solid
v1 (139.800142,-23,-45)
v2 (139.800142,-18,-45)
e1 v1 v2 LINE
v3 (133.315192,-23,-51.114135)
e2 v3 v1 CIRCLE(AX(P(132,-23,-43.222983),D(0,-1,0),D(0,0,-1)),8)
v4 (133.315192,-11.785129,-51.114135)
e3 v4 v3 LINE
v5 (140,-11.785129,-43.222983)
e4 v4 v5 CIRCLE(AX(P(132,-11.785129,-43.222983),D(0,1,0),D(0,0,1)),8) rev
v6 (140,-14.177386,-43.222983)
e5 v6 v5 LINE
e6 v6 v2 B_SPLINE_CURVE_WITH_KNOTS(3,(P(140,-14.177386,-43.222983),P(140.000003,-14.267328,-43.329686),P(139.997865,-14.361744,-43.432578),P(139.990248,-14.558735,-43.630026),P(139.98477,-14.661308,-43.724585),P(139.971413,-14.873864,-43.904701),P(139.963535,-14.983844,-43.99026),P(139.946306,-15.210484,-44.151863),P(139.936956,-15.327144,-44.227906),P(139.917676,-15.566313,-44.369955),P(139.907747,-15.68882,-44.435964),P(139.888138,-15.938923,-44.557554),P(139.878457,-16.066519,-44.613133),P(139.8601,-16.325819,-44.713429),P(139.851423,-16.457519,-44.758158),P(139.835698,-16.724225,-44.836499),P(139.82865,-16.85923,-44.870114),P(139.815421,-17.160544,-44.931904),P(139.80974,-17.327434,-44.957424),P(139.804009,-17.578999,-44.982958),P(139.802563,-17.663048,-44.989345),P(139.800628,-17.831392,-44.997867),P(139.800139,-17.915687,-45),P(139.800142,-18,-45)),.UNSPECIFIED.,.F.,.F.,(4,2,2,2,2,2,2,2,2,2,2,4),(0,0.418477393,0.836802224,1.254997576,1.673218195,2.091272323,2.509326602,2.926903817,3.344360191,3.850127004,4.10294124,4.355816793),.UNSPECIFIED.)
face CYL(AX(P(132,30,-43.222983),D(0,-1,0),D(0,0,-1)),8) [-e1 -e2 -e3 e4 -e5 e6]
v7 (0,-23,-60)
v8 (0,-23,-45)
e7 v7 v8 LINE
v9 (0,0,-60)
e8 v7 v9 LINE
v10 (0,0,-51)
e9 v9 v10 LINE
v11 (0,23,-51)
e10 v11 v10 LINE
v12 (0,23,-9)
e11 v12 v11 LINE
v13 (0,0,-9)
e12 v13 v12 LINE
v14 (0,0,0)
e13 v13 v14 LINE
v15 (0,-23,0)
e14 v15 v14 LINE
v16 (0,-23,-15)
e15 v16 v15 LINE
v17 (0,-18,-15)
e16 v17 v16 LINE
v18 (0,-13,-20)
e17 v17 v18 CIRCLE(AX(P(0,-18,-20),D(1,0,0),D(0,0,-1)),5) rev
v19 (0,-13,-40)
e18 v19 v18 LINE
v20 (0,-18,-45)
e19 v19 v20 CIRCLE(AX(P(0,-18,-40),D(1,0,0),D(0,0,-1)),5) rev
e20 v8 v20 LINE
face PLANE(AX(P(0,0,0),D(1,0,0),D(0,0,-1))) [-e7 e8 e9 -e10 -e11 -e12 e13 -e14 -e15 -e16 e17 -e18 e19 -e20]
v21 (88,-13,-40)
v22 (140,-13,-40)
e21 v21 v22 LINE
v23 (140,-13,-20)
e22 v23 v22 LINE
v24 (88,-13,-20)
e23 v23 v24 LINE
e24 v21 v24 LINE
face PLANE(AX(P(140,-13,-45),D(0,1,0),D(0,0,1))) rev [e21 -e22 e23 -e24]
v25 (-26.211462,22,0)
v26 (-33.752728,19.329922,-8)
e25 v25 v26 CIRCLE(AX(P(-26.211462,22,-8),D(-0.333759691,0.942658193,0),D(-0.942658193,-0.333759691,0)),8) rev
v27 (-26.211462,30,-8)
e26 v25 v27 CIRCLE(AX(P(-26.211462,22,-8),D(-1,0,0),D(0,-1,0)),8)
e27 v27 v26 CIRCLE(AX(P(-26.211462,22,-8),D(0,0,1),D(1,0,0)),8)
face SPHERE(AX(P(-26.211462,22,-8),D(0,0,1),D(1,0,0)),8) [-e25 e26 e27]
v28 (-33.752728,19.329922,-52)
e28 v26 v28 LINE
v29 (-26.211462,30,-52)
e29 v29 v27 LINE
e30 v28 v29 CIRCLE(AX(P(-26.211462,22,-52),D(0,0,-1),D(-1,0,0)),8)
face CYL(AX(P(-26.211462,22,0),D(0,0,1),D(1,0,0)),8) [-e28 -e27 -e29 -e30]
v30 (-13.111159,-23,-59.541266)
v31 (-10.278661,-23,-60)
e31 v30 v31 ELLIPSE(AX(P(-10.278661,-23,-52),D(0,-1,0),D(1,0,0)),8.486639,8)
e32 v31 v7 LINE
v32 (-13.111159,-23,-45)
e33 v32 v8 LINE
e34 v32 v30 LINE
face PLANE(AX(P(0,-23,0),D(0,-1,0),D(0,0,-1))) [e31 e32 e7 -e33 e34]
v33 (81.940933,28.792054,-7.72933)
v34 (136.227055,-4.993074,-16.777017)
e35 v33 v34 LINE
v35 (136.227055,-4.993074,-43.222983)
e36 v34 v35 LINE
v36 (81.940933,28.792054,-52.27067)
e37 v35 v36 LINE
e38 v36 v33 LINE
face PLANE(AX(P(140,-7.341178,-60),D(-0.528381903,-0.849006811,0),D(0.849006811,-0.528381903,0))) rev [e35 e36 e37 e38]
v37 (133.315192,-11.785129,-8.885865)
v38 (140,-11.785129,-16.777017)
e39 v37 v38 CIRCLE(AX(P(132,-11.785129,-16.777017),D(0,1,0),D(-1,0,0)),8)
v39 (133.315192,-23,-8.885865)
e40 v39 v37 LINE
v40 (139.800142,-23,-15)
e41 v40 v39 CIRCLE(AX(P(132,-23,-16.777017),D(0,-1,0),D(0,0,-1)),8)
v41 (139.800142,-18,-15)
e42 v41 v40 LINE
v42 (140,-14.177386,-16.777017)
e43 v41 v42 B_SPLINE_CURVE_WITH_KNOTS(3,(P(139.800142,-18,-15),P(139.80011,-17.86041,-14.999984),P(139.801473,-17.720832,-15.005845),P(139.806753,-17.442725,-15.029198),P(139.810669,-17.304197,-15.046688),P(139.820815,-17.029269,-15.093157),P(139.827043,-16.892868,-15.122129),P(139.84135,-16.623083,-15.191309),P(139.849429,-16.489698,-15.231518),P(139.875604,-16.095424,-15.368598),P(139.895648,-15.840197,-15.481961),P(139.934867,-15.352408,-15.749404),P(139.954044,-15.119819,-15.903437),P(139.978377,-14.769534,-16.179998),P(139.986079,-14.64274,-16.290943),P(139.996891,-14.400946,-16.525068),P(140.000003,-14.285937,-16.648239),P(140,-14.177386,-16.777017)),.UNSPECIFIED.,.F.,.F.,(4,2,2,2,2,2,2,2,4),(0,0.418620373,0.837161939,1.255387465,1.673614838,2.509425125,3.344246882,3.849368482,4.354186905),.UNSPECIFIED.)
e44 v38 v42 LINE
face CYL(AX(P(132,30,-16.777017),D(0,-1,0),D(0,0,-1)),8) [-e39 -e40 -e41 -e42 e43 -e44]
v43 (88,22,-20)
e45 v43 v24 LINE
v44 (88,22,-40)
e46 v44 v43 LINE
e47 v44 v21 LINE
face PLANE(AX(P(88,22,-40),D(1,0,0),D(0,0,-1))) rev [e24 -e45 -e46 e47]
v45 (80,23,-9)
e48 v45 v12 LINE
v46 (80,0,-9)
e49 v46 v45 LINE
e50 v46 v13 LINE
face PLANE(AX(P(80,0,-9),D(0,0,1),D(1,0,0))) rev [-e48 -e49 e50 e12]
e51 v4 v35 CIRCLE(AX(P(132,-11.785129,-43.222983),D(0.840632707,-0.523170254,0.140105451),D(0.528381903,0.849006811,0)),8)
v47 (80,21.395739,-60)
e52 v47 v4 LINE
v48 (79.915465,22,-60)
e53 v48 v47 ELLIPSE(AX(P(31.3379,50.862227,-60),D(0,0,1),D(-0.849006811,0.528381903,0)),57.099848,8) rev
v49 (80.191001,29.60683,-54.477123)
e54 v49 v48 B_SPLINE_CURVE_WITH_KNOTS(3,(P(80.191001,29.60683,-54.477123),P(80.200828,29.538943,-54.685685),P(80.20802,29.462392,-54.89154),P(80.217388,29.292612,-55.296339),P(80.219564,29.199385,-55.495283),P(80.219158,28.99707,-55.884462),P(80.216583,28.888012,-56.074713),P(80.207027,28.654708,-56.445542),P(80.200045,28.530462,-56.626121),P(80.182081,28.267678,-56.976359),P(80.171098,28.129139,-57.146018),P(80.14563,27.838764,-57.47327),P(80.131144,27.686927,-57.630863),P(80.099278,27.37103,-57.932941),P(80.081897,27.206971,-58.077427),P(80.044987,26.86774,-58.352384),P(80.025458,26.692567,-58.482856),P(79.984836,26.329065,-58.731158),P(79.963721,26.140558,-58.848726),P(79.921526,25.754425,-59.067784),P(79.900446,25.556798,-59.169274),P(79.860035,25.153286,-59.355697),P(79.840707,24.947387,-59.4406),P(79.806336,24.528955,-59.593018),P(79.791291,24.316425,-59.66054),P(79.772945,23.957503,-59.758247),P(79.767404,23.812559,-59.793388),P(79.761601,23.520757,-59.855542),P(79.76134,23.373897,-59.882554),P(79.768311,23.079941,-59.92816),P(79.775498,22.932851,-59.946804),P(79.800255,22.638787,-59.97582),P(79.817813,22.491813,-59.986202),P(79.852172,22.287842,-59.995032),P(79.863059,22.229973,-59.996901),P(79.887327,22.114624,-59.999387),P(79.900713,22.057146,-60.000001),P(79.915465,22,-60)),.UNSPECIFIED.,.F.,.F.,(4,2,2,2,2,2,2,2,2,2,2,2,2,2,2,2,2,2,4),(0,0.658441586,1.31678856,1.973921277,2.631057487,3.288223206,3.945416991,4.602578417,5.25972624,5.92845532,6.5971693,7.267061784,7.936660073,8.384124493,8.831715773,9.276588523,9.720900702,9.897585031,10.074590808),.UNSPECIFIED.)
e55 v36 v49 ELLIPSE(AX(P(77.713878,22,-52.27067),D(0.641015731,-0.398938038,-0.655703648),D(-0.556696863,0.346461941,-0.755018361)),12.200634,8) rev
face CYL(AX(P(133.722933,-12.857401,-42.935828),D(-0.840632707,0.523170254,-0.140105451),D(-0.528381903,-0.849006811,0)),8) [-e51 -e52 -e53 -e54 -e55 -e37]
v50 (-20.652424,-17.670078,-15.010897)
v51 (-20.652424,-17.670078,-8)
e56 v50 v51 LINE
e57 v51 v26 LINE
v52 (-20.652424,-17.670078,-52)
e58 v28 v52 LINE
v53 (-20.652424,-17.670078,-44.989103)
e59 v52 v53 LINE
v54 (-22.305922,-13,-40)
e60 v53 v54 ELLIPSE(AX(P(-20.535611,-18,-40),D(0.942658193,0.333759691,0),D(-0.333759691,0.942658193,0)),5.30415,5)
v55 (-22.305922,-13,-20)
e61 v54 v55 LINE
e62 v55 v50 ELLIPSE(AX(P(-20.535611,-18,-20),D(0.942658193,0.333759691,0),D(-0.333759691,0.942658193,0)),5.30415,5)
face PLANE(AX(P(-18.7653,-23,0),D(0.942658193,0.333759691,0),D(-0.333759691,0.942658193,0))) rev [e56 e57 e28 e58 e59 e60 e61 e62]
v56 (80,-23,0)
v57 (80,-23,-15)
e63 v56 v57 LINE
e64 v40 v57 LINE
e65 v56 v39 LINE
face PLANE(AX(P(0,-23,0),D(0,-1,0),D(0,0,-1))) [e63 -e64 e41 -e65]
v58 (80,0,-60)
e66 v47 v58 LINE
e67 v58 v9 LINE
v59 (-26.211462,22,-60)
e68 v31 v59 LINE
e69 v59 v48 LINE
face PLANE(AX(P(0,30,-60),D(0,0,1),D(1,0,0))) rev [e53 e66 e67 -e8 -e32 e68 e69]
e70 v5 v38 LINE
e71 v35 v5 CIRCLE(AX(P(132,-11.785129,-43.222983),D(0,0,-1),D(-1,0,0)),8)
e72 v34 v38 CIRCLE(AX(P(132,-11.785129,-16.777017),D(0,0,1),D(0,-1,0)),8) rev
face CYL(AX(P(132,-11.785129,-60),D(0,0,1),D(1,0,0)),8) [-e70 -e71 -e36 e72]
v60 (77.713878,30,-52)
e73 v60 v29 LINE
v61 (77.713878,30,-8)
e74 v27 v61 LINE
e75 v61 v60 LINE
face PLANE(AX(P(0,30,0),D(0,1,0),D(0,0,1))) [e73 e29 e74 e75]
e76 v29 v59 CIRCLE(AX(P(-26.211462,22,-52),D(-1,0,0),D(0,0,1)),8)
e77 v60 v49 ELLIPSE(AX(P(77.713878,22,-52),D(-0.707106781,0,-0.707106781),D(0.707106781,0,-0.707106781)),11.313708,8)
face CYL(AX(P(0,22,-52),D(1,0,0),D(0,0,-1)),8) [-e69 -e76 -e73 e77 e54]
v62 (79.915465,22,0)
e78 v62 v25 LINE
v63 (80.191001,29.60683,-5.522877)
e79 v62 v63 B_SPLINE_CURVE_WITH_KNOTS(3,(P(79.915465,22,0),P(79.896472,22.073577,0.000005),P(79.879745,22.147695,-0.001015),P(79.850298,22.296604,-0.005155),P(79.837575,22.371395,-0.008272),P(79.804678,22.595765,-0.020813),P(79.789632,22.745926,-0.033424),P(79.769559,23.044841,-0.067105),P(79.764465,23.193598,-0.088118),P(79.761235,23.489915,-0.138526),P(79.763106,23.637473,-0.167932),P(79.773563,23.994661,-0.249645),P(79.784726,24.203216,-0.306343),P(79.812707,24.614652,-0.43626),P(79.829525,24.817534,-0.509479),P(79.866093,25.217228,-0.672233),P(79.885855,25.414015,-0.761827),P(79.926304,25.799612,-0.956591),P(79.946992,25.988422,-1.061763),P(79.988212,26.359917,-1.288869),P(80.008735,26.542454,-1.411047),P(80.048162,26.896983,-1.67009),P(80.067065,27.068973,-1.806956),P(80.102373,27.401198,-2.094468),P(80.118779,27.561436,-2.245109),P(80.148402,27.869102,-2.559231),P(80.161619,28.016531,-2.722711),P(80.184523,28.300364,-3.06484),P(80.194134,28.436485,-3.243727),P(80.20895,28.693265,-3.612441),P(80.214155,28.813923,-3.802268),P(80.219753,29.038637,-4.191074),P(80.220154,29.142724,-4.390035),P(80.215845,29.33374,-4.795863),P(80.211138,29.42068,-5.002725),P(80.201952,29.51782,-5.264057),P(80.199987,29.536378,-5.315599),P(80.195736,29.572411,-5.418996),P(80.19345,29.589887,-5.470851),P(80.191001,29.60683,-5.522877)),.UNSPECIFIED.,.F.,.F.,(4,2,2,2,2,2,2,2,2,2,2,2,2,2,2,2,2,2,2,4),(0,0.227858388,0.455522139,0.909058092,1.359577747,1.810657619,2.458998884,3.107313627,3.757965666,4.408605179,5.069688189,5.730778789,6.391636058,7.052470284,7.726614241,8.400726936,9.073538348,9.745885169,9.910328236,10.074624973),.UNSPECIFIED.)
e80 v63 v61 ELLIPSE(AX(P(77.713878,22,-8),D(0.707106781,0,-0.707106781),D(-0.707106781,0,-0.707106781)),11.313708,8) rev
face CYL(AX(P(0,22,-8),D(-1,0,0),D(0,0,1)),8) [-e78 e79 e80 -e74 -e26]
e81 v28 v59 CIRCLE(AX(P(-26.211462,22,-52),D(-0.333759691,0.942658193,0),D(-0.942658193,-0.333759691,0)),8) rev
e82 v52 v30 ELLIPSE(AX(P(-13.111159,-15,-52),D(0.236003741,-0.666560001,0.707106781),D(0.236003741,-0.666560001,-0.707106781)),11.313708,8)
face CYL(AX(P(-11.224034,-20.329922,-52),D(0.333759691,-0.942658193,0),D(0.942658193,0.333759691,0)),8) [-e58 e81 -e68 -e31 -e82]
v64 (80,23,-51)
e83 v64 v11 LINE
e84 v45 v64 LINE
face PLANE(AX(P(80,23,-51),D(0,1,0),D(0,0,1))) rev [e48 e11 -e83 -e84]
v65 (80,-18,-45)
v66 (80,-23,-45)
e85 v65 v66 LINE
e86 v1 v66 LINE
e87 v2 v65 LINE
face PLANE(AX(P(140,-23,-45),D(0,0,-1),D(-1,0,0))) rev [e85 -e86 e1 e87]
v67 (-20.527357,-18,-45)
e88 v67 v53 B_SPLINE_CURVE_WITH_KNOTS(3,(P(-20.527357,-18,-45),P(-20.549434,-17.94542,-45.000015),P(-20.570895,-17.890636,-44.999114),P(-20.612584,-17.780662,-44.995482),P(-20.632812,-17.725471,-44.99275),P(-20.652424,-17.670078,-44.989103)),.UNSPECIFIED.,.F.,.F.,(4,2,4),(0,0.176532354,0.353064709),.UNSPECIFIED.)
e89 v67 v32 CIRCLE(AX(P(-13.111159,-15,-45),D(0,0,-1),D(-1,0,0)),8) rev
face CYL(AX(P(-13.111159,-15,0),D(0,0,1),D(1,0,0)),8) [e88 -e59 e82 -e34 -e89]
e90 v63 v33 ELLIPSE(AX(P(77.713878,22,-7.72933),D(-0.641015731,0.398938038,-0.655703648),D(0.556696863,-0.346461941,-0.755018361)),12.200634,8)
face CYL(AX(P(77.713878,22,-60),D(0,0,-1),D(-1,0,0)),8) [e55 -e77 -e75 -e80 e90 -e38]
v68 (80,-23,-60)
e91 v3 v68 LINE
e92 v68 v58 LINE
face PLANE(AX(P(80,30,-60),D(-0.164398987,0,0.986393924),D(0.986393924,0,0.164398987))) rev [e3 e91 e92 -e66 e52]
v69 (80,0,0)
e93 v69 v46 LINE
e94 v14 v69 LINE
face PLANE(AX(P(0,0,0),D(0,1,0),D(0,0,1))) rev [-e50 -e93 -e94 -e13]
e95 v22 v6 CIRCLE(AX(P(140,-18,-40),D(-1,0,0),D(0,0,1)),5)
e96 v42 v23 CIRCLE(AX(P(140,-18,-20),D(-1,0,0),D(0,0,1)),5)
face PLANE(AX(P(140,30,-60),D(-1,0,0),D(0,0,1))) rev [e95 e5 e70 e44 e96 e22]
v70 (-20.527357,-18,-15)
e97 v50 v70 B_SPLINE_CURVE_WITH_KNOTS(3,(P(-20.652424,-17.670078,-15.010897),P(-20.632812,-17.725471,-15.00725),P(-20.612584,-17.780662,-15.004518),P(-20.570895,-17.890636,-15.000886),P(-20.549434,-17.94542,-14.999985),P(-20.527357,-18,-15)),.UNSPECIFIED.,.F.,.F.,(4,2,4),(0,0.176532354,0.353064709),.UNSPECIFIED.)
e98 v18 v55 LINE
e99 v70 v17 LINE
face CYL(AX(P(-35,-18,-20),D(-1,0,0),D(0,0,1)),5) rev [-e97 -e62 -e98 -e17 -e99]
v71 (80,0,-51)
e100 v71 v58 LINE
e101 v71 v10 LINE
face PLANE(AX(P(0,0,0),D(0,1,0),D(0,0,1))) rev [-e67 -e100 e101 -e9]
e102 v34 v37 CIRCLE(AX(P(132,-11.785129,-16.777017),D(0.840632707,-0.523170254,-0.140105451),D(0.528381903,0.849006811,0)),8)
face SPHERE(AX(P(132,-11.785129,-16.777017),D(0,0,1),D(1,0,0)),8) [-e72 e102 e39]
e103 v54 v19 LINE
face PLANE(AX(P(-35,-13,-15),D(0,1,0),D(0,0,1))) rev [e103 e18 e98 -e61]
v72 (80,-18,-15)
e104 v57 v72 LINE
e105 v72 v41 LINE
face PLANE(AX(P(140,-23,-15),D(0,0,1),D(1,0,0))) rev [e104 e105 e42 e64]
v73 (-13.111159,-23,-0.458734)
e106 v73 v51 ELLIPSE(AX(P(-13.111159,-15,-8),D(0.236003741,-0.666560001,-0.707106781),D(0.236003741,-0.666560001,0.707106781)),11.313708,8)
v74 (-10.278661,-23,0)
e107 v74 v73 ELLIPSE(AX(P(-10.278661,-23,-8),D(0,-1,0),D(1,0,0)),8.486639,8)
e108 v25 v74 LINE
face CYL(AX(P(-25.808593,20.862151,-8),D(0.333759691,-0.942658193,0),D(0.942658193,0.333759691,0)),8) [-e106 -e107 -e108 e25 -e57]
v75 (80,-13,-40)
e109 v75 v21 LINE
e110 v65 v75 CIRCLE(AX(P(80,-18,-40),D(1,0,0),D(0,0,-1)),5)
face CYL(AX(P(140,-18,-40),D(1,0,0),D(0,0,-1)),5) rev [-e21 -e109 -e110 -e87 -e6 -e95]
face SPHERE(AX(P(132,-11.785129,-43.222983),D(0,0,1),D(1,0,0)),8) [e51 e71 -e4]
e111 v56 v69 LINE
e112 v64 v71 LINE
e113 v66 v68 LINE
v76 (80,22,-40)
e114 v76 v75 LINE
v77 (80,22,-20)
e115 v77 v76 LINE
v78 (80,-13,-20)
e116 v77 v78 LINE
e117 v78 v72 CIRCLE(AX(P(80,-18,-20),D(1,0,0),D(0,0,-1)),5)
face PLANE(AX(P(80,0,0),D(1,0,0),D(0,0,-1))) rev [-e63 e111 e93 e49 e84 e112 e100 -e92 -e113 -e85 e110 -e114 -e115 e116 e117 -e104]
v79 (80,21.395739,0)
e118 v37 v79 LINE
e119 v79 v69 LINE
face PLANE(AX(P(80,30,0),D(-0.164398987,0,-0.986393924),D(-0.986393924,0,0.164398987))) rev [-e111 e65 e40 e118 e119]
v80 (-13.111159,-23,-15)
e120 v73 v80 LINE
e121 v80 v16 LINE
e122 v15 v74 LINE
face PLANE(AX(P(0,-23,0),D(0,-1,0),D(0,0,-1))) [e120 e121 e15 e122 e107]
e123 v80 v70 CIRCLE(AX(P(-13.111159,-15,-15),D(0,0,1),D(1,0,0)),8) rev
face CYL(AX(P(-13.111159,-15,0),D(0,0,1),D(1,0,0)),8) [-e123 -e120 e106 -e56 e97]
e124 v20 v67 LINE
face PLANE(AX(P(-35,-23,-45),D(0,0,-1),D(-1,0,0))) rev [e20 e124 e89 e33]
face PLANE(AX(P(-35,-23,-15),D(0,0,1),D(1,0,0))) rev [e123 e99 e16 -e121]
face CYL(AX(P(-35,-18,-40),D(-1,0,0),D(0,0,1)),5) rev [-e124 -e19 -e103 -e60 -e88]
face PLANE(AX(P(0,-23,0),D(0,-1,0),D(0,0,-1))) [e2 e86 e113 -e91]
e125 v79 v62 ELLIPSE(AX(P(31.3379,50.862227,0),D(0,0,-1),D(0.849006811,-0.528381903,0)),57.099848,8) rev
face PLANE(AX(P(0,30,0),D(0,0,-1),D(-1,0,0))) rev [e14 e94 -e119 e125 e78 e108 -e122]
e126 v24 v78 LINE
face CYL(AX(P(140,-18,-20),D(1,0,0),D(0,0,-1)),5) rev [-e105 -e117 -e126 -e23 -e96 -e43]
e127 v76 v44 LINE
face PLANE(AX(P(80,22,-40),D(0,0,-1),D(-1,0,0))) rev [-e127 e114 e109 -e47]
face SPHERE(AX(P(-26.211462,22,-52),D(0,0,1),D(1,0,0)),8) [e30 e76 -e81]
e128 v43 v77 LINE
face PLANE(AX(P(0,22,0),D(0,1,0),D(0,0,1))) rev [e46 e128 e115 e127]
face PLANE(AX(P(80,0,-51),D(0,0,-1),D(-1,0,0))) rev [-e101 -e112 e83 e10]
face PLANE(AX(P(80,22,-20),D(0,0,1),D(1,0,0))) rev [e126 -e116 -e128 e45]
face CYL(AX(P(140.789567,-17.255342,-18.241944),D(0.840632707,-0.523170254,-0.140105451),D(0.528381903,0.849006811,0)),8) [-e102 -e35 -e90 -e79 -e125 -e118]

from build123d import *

# Parameters (mm, degrees)
SKETCH1_W            = 140
SKETCH1_H            = 60
BOSS_EXTRUDE2_DEPTH  = 30
SKETCH2_W            = 42
SKETCH2_H            = 23
CUT_EXTRUDE1_DEPTH   = 80
SKETCH3_W            = 60
SKETCH3_H            = 60
BOSS_EXTRUDE3_DEPTH  = 23
CUT_EXTRUDE6_DEPTH   = 156.241746963
SKETCH15_W           = 60
SKETCH15_H           = 30
BOSS_EXTRUDE9_DEPTH  = 20
SKETCH16_W           = 20
SKETCH16_H           = 60
BOSS_EXTRUDE10_DEPTH = 23
CUT_EXTRUDE9_DEPTH   = 162.273060367
CUT_EXTRUDE11_DEPTH  = 162.273060367
SKETCH20_W           = 17.5305996
SKETCH20_H           = 53
BOSS_EXTRUDE11_DEPTH = 60
CUT_EXTRUDE12_DEPTH  = 156.241746963
FILLET8_R            = 8
FILLET9_R            = 8
SKETCH22_W           = 30
SKETCH22_H           = 10
CUT_EXTRUDE13_DEPTH  = 133.454739954
FILLET11_R           = 5
SKETCH23_W           = 8
SKETCH23_H           = 20
CUT_EXTRUDE14_DEPTH  = 35
SKETCH24_W           = 30
SKETCH24_H           = 10
CUT_EXTRUDE15_DEPTH  = 35
FILLET12_R           = 5


with BuildPart() as part:
    # Sketch1 → Boss-Extrude2 (new body)
    with BuildSketch(Plane(origin=(0, 0, 0), x_dir=(1, 0, 0), z_dir=(0, 1, 0))):
        with Locations((70, 30)):
            Rectangle(SKETCH1_W, SKETCH1_H)
    extrude(amount=BOSS_EXTRUDE2_DEPTH)

    # Sketch2 → Cut-Extrude1 (cut)
    with BuildSketch(Plane.ZY):
        with Locations((-30, 11.5)):
            Rectangle(SKETCH2_W, SKETCH2_H)
    extrude(amount=-CUT_EXTRUDE1_DEPTH, mode=Mode.SUBTRACT)

    # Sketch3 → Boss-Extrude3 (add)
    with BuildSketch(Plane.XZ):
        with Locations((110, -30)):
            Rectangle(SKETCH3_W, SKETCH3_H)
    extrude(amount=BOSS_EXTRUDE3_DEPTH)

    # Sketch4 → Cut-Extrude6 (cut, through all)
    with BuildSketch(Plane.XY):
        Polygon((140, -7.341177678), (80, 30), (140, 30), align=None)
    extrude(amount=-CUT_EXTRUDE6_DEPTH, mode=Mode.SUBTRACT)

    # Sketch15 → Boss-Extrude9 (add)
    with BuildSketch(Plane.ZY):
        with Locations((-30, 15)):
            Rectangle(SKETCH15_W, SKETCH15_H)
    extrude(amount=BOSS_EXTRUDE9_DEPTH)

    # Sketch16 → Boss-Extrude10 (add)
    with BuildSketch(Plane.XZ):
        with Locations((-10, -30)):
            Rectangle(SKETCH16_W, SKETCH16_H)
    extrude(amount=BOSS_EXTRUDE10_DEPTH)

    # Sketch17 → Cut-Extrude9 (cut, through all)
    with BuildSketch(Plane.XZ.offset(23)):
        Polygon((80, -60), (140, -50), (140, -60), align=None)
    extrude(amount=-CUT_EXTRUDE9_DEPTH, mode=Mode.SUBTRACT)

    # Sketch18 → Cut-Extrude11 (cut, through all)
    with BuildSketch(Plane.XZ.offset(23)):
        Polygon((80, 0), (140, -10), (140, 0), align=None)
    extrude(amount=-CUT_EXTRUDE11_DEPTH, mode=Mode.SUBTRACT)

    # Sketch20 → Boss-Extrude11 (add, through all)
    with BuildSketch(Plane(origin=(0, 0, -60), x_dir=(-1, 0, 0), z_dir=(0, 0, -1))):
        with Locations((28.7652998, 3.5)):
            Rectangle(SKETCH20_W, SKETCH20_H)
    extrude(amount=-BOSS_EXTRUDE11_DEPTH)

    # Sketch21 → Cut-Extrude12 (cut, through all)
    with BuildSketch(Plane(origin=(0, 0, -60), x_dir=(-1, 0, 0), z_dir=(0, 0, -1))):
        Polygon((18.7652998, -23), (37.5305996, 30), (37.5305996, -23), align=None)
    extrude(amount=-CUT_EXTRUDE12_DEPTH, mode=Mode.SUBTRACT)

    # Fillet8
    # the kernel refuses this fillet: 8 mm, written as the material it takes off along each edge
    with BuildSketch(Plane(origin=(-26.211462289, 22, -52), x_dir=(0, 1, 0), z_dir=(0, 0, -1))) as fillet8_piece_1_section:
        Polygon((0, 0), (FILLET8_R, 0), (FILLET8_R, -FILLET8_R * 1.41489216391), (-FILLET8_R * 0.333759690599, -FILLET8_R * 0.942658193054), align=None)
    fillet8_piece_1 = extrude(amount=FILLET8_R, mode=Mode.PRIVATE)
    fillet8_piece_1 = fillet8_piece_1 - Plane(origin=(-26.211462289, 22, -52), x_dir=(0.816627115211936, -0.5771656215512417, 0), z_dir=(0, 0, -1)) * Sphere(FILLET8_R, mode=Mode.PRIVATE)
    add(fillet8_piece_1, mode=Mode.SUBTRACT)
    with BuildSketch(Plane(origin=(-26.211462289, 22, -8), x_dir=(0, 1, 0), z_dir=(0, 0, 1))) as fillet8_piece_2_section:
        Polygon((0, 0), (FILLET8_R, 0), (FILLET8_R, FILLET8_R * 1.41489216391), (-FILLET8_R * 0.333759690599, FILLET8_R * 0.942658193054), align=None)
    fillet8_piece_2 = extrude(amount=FILLET8_R, mode=Mode.PRIVATE)
    fillet8_piece_2 = fillet8_piece_2 - Plane(origin=(-26.211462289, 22, -8), x_dir=(0.816627115211936, -0.5771656215512417, 0), z_dir=(0, 0, 1)) * Sphere(FILLET8_R, mode=Mode.PRIVATE)
    add(fillet8_piece_2, mode=Mode.SUBTRACT)
    with BuildSketch(Plane(origin=(-37.5305996, 30, -52), x_dir=(1, 0, 0), z_dir=(0, 0, 1))) as fillet8_piece_3:
        with BuildLine():
            CenterArc((FILLET8_R * 1.41489216391, -FILLET8_R), FILLET8_R, 90, 109.497133014)
            Line((FILLET8_R * 0.472233970858, -FILLET8_R * 1.3337596906), (0, 0))
            Line((0, 0), (FILLET8_R * 1.41489216391, 0))
        make_face()
    extrude(amount=44, mode=Mode.SUBTRACT)
    with BuildSketch(Plane(origin=(-33.752727833, 19.329922475, 0), x_dir=(0, 0, -1), z_dir=(0.3337596905987375, -0.9426581930537893, 0))) as fillet8_piece_4:
        with BuildLine():
            CenterArc((FILLET8_R, FILLET8_R), FILLET8_R, 180, 90)
            Line((0, FILLET8_R), (0, 0))
            Line((0, 0), (FILLET8_R, 0))
        make_face()
    extrude(amount=64.904847576, mode=Mode.SUBTRACT)
    with BuildSketch(Plane(origin=(-18.7652998, -23, -74.135352863), x_dir=(-0.33375969059873745, 0.9426581930537893, 0), z_dir=(0, 0, 1))) as fillet8_piece_5:
        with BuildLine():
            CenterArc((FILLET8_R * 0.706767643151, -FILLET8_R), FILLET8_R, 90, 70.502866986)
            Line((-FILLET8_R * 0.235890549903, -FILLET8_R * 0.666240309401), (0, 0))
            Line((0, 0), (FILLET8_R * 0.706767643151, 0))
        make_face()
    extrude(amount=88.270705726, mode=Mode.SUBTRACT)
    with BuildSketch(Plane(origin=(-12.090105988, -41.853163861, -60), x_dir=(0.9426581930537893, 0.3337596905987375, 0), z_dir=(-0.3337596905987375, 0.9426581930537893, 0))) as fillet8_piece_6:
        with BuildLine():
            CenterArc((FILLET8_R, -FILLET8_R), FILLET8_R, 90, 90)
            Line((0, -FILLET8_R), (0, 0))
            Line((0, 0), (FILLET8_R, 0))
        make_face()
    extrude(amount=64.904847576, mode=Mode.SUBTRACT)
    with BuildSketch(Plane(origin=(-26.211462289, 30, -60), x_dir=(0, -1, 0), z_dir=(1, 0, 0)), Plane(origin=(-26.211462289, 30, 0), x_dir=(0, 0, -1), z_dir=(1, 0, 0))) as fillet8_piece_7:
        with BuildLine():
            CenterArc((FILLET8_R, -FILLET8_R), FILLET8_R, 90, 90)
            Line((0, -FILLET8_R), (0, 0))
            Line((0, 0), (FILLET8_R, 0))
        make_face()
    extrude(amount=166.211462289, mode=Mode.SUBTRACT)
    with BuildSketch(Plane(origin=(80, 30, 5.715305101), x_dir=(-1, 0, 0), z_dir=(0, 0, -1))) as fillet8_piece_8:
        with BuildLine():
            CenterArc((FILLET8_R * 0.285765255038, -FILLET8_R), FILLET8_R, 90, 31.896191579)
            Line((-FILLET8_R * 0.24261664781, -FILLET8_R * 0.150993189225), (0, 0))
            Line((0, 0), (FILLET8_R * 0.285765255038, 0))
        make_face()
    extrude(amount=71.430610202, mode=Mode.SUBTRACT)

    # Fillet9
    # the kernel refuses this fillet: 8 mm, written as the material it takes off along each edge
    with BuildSketch(Plane(origin=(132, -11.785128809, -43.222983293), x_dir=(-0.48401910269158954, 0.8713310986405968, -0.08066985044859834), z_dir=(0.7927787698772593, 0.3976147054703528, -0.46195710626163544))) as fillet9_piece_1_section:
        Polygon((-13.665079079, -13.665079079), (13.665079079, -13.665079079), (13.665079079, 13.665079079), (-13.665079079, 13.665079079), align=None)
    fillet9_piece_1 = extrude(amount=13.665079079, mode=Mode.PRIVATE)
    fillet9_piece_1 = split(fillet9_piece_1, bisect_by=Plane(origin=(132, -11.785128809, -43.222983293), z_dir=(0.8406327066696059, -0.5231702543590824, 0.1401054511116011)), keep=Keep.TOP, mode=Mode.PRIVATE)
    fillet9_piece_1 = split(fillet9_piece_1, bisect_by=Plane(origin=(132, -11.785128809, -43.222983293), z_dir=(0, 0, -1)), keep=Keep.TOP, mode=Mode.PRIVATE)
    fillet9_piece_1 = split(fillet9_piece_1, bisect_by=Plane(origin=(132, -11.785128809, -43.222983293), z_dir=(0, 1, 0)), keep=Keep.TOP, mode=Mode.PRIVATE)
    fillet9_piece_1 = split(fillet9_piece_1, bisect_by=Plane(origin=(133.315191898, -11.785128809, -51.114134684), z_dir=(-0.16439898730535743, 0, 0.9863939238321437)), keep=Keep.TOP, mode=Mode.PRIVATE)
    fillet9_piece_1 = split(fillet9_piece_1, bisect_by=Plane(origin=(136.227055223, -4.993074323, -43.222983293), z_dir=(-0.5283819028475878, -0.8490068107754862, 0)), keep=Keep.TOP, mode=Mode.PRIVATE)
    fillet9_piece_1 = split(fillet9_piece_1, bisect_by=Plane(origin=(140, -11.785128809, -43.222983293), z_dir=(-1, 0, 0)), keep=Keep.TOP, mode=Mode.PRIVATE)
    fillet9_piece_1 = fillet9_piece_1 - Plane(origin=(132, -11.785128809, -43.222983293), x_dir=(-0.7927787698772593, -0.3976147054703528, 0.46195710626163544), z_dir=(-0.48401910269158954, 0.8713310986405968, -0.08066985044859834)) * Sphere(FILLET9_R, mode=Mode.PRIVATE)
    add(fillet9_piece_1, mode=Mode.SUBTRACT)
    with BuildSketch(Plane(origin=(132, -11.785128809, -16.777016707), x_dir=(0, 0.7579161794569693, -0.6523519486575872), z_dir=(0.7927787698772593, 0.3976147054703528, 0.46195710626163544))) as fillet9_piece_2_section:
        Polygon((-13.665079079, -13.665079079), (13.665079079, -13.665079079), (13.665079079, 13.665079079), (-13.665079079, 13.665079079), align=None)
    fillet9_piece_2 = extrude(amount=13.665079079, mode=Mode.PRIVATE)
    fillet9_piece_2 = split(fillet9_piece_2, bisect_by=Plane(origin=(132, -11.785128809, -16.777016707), z_dir=(0, 0, 1)), keep=Keep.TOP, mode=Mode.PRIVATE)
    fillet9_piece_2 = split(fillet9_piece_2, bisect_by=Plane(origin=(132, -11.785128809, -16.777016707), z_dir=(0.8406327066696059, -0.5231702543590824, -0.140105451111601)), keep=Keep.TOP, mode=Mode.PRIVATE)
    fillet9_piece_2 = split(fillet9_piece_2, bisect_by=Plane(origin=(132, -11.785128809, -16.777016707), z_dir=(0, 1, 0)), keep=Keep.TOP, mode=Mode.PRIVATE)
    fillet9_piece_2 = split(fillet9_piece_2, bisect_by=Plane(origin=(140, -11.785128809, -16.777016707), z_dir=(-1, 0, 0)), keep=Keep.TOP, mode=Mode.PRIVATE)
    fillet9_piece_2 = split(fillet9_piece_2, bisect_by=Plane(origin=(136.227055223, -4.993074323, -16.777016707), z_dir=(-0.5283819028475878, -0.8490068107754862, 0)), keep=Keep.TOP, mode=Mode.PRIVATE)
    fillet9_piece_2 = split(fillet9_piece_2, bisect_by=Plane(origin=(133.315191898, -11.785128809, -8.885865316), z_dir=(-0.1643989873053573, 0, -0.9863939238321437)), keep=Keep.TOP, mode=Mode.PRIVATE)
    fillet9_piece_2 = fillet9_piece_2 - Plane(origin=(132, -11.785128809, -16.777016707), x_dir=(-0.7927787698772593, -0.3976147054703528, -0.46195710626163544), z_dir=(0, 0.7579161794569693, -0.6523519486575872)) * Sphere(FILLET9_R, mode=Mode.PRIVATE)
    add(fillet9_piece_2, mode=Mode.SUBTRACT)
    with BuildSketch(Plane(origin=(140, -39.942541768, -50), x_dir=(-0.9863939238321437, 0, -0.1643989873053573), z_dir=(0, 1, 0)), Plane(origin=(140, -39.942541768, -10), x_dir=(0, 0, -1), z_dir=(0, 1, 0))) as fillet9_piece_3:
        with BuildLine():
            CenterArc((FILLET9_R * 0.847127088383, FILLET9_R), FILLET9_R, 189.462322208, 80.537677792)
            Line((-FILLET9_R * 0.139266835449, FILLET9_R * 0.835601012695), (0, 0))
            Line((0, 0), (FILLET9_R * 0.847127088383, 0))
        make_face()
    extrude(amount=28.157412959, mode=Mode.SUBTRACT)
    with BuildSketch(Plane(origin=(140, -7.341177678, -16.777016707), x_dir=(0, -1, 0), z_dir=(0, 0, -1))) as fillet9_piece_4:
        with BuildLine():
            CenterArc((FILLET9_R * 0.555493891411, FILLET9_R), FILLET9_R, 211.896191579, 58.103808421)
            Line((-FILLET9_R * 0.293512919364, FILLET9_R * 0.471618097152), (0, 0))
            Line((0, 0), (FILLET9_R * 0.555493891411, 0))
        make_face()
    extrude(amount=26.445966586, mode=Mode.SUBTRACT)
    with BuildSketch(Plane(origin=(137.099294602, -5.535915084, -50.4834509), x_dir=(-0.516051960029516, -0.8522281883121756, -0.08600866000491966), z_dir=(-0.840632706669606, 0.5231702543590825, -0.1401054511116011)), Plane(origin=(137.099294602, -5.535915084, -9.5165491), x_dir=(-0.1189504822205207, 0.07402918485766816, -0.9901365878346354), z_dir=(-0.840632706669606, 0.5231702543590825, 0.140105451111601))) as fillet9_piece_5:
        with BuildLine():
            CenterArc((FILLET9_R * 0.916599247, FILLET9_R), FILLET9_R, 184.983304115, 85.016695885)
            Line((-FILLET9_R * 0.0796208058207, FILLET9_R * 0.913134550261), (0, 0))
            Line((0, 0), (FILLET9_R * 0.916599247, 0))
        make_face()
    extrude(amount=78.609137146, mode=Mode.SUBTRACT)

    # Sketch22 → Cut-Extrude13 (cut, through all)
    with BuildSketch(Plane.ZY.offset(-80)):
        with Locations((-30, -18)):
            Rectangle(SKETCH22_W, SKETCH22_H)
    extrude(amount=-CUT_EXTRUDE13_DEPTH, mode=Mode.SUBTRACT)

    # Fillet11
    fillet11_edges = [part.edges().sort_by_distance(p)[0] for p in [
        (109.900070885, -13, -45),
        (109.900070885, -13, -15),
    ]]
    fillet(fillet11_edges, radius=FILLET11_R)

    # Sketch23 → Cut-Extrude14 (cut)
    with BuildSketch(Plane.XZ.offset(13)):
        with Locations((84, -30)):
            Rectangle(SKETCH23_W, SKETCH23_H)
    extrude(amount=-CUT_EXTRUDE14_DEPTH, mode=Mode.SUBTRACT)

    # Sketch24 → Cut-Extrude15 (cut)
    with BuildSketch(Plane(origin=(0, 0, 0), x_dir=(0, 0, -1), z_dir=(1, 0, 0))):
        with Locations((30, -18)):
            Rectangle(SKETCH24_W, SKETCH24_H)
    extrude(amount=-CUT_EXTRUDE15_DEPTH, mode=Mode.SUBTRACT)

    # Fillet12
    fillet12_edges = [part.edges().sort_by_distance(p)[0] for p in [
        (-11.152961202, -13, -45),
        (-11.152961202, -13, -15),
    ]]
    fillet(fillet12_edges, radius=FILLET12_R)


solid = part.part
